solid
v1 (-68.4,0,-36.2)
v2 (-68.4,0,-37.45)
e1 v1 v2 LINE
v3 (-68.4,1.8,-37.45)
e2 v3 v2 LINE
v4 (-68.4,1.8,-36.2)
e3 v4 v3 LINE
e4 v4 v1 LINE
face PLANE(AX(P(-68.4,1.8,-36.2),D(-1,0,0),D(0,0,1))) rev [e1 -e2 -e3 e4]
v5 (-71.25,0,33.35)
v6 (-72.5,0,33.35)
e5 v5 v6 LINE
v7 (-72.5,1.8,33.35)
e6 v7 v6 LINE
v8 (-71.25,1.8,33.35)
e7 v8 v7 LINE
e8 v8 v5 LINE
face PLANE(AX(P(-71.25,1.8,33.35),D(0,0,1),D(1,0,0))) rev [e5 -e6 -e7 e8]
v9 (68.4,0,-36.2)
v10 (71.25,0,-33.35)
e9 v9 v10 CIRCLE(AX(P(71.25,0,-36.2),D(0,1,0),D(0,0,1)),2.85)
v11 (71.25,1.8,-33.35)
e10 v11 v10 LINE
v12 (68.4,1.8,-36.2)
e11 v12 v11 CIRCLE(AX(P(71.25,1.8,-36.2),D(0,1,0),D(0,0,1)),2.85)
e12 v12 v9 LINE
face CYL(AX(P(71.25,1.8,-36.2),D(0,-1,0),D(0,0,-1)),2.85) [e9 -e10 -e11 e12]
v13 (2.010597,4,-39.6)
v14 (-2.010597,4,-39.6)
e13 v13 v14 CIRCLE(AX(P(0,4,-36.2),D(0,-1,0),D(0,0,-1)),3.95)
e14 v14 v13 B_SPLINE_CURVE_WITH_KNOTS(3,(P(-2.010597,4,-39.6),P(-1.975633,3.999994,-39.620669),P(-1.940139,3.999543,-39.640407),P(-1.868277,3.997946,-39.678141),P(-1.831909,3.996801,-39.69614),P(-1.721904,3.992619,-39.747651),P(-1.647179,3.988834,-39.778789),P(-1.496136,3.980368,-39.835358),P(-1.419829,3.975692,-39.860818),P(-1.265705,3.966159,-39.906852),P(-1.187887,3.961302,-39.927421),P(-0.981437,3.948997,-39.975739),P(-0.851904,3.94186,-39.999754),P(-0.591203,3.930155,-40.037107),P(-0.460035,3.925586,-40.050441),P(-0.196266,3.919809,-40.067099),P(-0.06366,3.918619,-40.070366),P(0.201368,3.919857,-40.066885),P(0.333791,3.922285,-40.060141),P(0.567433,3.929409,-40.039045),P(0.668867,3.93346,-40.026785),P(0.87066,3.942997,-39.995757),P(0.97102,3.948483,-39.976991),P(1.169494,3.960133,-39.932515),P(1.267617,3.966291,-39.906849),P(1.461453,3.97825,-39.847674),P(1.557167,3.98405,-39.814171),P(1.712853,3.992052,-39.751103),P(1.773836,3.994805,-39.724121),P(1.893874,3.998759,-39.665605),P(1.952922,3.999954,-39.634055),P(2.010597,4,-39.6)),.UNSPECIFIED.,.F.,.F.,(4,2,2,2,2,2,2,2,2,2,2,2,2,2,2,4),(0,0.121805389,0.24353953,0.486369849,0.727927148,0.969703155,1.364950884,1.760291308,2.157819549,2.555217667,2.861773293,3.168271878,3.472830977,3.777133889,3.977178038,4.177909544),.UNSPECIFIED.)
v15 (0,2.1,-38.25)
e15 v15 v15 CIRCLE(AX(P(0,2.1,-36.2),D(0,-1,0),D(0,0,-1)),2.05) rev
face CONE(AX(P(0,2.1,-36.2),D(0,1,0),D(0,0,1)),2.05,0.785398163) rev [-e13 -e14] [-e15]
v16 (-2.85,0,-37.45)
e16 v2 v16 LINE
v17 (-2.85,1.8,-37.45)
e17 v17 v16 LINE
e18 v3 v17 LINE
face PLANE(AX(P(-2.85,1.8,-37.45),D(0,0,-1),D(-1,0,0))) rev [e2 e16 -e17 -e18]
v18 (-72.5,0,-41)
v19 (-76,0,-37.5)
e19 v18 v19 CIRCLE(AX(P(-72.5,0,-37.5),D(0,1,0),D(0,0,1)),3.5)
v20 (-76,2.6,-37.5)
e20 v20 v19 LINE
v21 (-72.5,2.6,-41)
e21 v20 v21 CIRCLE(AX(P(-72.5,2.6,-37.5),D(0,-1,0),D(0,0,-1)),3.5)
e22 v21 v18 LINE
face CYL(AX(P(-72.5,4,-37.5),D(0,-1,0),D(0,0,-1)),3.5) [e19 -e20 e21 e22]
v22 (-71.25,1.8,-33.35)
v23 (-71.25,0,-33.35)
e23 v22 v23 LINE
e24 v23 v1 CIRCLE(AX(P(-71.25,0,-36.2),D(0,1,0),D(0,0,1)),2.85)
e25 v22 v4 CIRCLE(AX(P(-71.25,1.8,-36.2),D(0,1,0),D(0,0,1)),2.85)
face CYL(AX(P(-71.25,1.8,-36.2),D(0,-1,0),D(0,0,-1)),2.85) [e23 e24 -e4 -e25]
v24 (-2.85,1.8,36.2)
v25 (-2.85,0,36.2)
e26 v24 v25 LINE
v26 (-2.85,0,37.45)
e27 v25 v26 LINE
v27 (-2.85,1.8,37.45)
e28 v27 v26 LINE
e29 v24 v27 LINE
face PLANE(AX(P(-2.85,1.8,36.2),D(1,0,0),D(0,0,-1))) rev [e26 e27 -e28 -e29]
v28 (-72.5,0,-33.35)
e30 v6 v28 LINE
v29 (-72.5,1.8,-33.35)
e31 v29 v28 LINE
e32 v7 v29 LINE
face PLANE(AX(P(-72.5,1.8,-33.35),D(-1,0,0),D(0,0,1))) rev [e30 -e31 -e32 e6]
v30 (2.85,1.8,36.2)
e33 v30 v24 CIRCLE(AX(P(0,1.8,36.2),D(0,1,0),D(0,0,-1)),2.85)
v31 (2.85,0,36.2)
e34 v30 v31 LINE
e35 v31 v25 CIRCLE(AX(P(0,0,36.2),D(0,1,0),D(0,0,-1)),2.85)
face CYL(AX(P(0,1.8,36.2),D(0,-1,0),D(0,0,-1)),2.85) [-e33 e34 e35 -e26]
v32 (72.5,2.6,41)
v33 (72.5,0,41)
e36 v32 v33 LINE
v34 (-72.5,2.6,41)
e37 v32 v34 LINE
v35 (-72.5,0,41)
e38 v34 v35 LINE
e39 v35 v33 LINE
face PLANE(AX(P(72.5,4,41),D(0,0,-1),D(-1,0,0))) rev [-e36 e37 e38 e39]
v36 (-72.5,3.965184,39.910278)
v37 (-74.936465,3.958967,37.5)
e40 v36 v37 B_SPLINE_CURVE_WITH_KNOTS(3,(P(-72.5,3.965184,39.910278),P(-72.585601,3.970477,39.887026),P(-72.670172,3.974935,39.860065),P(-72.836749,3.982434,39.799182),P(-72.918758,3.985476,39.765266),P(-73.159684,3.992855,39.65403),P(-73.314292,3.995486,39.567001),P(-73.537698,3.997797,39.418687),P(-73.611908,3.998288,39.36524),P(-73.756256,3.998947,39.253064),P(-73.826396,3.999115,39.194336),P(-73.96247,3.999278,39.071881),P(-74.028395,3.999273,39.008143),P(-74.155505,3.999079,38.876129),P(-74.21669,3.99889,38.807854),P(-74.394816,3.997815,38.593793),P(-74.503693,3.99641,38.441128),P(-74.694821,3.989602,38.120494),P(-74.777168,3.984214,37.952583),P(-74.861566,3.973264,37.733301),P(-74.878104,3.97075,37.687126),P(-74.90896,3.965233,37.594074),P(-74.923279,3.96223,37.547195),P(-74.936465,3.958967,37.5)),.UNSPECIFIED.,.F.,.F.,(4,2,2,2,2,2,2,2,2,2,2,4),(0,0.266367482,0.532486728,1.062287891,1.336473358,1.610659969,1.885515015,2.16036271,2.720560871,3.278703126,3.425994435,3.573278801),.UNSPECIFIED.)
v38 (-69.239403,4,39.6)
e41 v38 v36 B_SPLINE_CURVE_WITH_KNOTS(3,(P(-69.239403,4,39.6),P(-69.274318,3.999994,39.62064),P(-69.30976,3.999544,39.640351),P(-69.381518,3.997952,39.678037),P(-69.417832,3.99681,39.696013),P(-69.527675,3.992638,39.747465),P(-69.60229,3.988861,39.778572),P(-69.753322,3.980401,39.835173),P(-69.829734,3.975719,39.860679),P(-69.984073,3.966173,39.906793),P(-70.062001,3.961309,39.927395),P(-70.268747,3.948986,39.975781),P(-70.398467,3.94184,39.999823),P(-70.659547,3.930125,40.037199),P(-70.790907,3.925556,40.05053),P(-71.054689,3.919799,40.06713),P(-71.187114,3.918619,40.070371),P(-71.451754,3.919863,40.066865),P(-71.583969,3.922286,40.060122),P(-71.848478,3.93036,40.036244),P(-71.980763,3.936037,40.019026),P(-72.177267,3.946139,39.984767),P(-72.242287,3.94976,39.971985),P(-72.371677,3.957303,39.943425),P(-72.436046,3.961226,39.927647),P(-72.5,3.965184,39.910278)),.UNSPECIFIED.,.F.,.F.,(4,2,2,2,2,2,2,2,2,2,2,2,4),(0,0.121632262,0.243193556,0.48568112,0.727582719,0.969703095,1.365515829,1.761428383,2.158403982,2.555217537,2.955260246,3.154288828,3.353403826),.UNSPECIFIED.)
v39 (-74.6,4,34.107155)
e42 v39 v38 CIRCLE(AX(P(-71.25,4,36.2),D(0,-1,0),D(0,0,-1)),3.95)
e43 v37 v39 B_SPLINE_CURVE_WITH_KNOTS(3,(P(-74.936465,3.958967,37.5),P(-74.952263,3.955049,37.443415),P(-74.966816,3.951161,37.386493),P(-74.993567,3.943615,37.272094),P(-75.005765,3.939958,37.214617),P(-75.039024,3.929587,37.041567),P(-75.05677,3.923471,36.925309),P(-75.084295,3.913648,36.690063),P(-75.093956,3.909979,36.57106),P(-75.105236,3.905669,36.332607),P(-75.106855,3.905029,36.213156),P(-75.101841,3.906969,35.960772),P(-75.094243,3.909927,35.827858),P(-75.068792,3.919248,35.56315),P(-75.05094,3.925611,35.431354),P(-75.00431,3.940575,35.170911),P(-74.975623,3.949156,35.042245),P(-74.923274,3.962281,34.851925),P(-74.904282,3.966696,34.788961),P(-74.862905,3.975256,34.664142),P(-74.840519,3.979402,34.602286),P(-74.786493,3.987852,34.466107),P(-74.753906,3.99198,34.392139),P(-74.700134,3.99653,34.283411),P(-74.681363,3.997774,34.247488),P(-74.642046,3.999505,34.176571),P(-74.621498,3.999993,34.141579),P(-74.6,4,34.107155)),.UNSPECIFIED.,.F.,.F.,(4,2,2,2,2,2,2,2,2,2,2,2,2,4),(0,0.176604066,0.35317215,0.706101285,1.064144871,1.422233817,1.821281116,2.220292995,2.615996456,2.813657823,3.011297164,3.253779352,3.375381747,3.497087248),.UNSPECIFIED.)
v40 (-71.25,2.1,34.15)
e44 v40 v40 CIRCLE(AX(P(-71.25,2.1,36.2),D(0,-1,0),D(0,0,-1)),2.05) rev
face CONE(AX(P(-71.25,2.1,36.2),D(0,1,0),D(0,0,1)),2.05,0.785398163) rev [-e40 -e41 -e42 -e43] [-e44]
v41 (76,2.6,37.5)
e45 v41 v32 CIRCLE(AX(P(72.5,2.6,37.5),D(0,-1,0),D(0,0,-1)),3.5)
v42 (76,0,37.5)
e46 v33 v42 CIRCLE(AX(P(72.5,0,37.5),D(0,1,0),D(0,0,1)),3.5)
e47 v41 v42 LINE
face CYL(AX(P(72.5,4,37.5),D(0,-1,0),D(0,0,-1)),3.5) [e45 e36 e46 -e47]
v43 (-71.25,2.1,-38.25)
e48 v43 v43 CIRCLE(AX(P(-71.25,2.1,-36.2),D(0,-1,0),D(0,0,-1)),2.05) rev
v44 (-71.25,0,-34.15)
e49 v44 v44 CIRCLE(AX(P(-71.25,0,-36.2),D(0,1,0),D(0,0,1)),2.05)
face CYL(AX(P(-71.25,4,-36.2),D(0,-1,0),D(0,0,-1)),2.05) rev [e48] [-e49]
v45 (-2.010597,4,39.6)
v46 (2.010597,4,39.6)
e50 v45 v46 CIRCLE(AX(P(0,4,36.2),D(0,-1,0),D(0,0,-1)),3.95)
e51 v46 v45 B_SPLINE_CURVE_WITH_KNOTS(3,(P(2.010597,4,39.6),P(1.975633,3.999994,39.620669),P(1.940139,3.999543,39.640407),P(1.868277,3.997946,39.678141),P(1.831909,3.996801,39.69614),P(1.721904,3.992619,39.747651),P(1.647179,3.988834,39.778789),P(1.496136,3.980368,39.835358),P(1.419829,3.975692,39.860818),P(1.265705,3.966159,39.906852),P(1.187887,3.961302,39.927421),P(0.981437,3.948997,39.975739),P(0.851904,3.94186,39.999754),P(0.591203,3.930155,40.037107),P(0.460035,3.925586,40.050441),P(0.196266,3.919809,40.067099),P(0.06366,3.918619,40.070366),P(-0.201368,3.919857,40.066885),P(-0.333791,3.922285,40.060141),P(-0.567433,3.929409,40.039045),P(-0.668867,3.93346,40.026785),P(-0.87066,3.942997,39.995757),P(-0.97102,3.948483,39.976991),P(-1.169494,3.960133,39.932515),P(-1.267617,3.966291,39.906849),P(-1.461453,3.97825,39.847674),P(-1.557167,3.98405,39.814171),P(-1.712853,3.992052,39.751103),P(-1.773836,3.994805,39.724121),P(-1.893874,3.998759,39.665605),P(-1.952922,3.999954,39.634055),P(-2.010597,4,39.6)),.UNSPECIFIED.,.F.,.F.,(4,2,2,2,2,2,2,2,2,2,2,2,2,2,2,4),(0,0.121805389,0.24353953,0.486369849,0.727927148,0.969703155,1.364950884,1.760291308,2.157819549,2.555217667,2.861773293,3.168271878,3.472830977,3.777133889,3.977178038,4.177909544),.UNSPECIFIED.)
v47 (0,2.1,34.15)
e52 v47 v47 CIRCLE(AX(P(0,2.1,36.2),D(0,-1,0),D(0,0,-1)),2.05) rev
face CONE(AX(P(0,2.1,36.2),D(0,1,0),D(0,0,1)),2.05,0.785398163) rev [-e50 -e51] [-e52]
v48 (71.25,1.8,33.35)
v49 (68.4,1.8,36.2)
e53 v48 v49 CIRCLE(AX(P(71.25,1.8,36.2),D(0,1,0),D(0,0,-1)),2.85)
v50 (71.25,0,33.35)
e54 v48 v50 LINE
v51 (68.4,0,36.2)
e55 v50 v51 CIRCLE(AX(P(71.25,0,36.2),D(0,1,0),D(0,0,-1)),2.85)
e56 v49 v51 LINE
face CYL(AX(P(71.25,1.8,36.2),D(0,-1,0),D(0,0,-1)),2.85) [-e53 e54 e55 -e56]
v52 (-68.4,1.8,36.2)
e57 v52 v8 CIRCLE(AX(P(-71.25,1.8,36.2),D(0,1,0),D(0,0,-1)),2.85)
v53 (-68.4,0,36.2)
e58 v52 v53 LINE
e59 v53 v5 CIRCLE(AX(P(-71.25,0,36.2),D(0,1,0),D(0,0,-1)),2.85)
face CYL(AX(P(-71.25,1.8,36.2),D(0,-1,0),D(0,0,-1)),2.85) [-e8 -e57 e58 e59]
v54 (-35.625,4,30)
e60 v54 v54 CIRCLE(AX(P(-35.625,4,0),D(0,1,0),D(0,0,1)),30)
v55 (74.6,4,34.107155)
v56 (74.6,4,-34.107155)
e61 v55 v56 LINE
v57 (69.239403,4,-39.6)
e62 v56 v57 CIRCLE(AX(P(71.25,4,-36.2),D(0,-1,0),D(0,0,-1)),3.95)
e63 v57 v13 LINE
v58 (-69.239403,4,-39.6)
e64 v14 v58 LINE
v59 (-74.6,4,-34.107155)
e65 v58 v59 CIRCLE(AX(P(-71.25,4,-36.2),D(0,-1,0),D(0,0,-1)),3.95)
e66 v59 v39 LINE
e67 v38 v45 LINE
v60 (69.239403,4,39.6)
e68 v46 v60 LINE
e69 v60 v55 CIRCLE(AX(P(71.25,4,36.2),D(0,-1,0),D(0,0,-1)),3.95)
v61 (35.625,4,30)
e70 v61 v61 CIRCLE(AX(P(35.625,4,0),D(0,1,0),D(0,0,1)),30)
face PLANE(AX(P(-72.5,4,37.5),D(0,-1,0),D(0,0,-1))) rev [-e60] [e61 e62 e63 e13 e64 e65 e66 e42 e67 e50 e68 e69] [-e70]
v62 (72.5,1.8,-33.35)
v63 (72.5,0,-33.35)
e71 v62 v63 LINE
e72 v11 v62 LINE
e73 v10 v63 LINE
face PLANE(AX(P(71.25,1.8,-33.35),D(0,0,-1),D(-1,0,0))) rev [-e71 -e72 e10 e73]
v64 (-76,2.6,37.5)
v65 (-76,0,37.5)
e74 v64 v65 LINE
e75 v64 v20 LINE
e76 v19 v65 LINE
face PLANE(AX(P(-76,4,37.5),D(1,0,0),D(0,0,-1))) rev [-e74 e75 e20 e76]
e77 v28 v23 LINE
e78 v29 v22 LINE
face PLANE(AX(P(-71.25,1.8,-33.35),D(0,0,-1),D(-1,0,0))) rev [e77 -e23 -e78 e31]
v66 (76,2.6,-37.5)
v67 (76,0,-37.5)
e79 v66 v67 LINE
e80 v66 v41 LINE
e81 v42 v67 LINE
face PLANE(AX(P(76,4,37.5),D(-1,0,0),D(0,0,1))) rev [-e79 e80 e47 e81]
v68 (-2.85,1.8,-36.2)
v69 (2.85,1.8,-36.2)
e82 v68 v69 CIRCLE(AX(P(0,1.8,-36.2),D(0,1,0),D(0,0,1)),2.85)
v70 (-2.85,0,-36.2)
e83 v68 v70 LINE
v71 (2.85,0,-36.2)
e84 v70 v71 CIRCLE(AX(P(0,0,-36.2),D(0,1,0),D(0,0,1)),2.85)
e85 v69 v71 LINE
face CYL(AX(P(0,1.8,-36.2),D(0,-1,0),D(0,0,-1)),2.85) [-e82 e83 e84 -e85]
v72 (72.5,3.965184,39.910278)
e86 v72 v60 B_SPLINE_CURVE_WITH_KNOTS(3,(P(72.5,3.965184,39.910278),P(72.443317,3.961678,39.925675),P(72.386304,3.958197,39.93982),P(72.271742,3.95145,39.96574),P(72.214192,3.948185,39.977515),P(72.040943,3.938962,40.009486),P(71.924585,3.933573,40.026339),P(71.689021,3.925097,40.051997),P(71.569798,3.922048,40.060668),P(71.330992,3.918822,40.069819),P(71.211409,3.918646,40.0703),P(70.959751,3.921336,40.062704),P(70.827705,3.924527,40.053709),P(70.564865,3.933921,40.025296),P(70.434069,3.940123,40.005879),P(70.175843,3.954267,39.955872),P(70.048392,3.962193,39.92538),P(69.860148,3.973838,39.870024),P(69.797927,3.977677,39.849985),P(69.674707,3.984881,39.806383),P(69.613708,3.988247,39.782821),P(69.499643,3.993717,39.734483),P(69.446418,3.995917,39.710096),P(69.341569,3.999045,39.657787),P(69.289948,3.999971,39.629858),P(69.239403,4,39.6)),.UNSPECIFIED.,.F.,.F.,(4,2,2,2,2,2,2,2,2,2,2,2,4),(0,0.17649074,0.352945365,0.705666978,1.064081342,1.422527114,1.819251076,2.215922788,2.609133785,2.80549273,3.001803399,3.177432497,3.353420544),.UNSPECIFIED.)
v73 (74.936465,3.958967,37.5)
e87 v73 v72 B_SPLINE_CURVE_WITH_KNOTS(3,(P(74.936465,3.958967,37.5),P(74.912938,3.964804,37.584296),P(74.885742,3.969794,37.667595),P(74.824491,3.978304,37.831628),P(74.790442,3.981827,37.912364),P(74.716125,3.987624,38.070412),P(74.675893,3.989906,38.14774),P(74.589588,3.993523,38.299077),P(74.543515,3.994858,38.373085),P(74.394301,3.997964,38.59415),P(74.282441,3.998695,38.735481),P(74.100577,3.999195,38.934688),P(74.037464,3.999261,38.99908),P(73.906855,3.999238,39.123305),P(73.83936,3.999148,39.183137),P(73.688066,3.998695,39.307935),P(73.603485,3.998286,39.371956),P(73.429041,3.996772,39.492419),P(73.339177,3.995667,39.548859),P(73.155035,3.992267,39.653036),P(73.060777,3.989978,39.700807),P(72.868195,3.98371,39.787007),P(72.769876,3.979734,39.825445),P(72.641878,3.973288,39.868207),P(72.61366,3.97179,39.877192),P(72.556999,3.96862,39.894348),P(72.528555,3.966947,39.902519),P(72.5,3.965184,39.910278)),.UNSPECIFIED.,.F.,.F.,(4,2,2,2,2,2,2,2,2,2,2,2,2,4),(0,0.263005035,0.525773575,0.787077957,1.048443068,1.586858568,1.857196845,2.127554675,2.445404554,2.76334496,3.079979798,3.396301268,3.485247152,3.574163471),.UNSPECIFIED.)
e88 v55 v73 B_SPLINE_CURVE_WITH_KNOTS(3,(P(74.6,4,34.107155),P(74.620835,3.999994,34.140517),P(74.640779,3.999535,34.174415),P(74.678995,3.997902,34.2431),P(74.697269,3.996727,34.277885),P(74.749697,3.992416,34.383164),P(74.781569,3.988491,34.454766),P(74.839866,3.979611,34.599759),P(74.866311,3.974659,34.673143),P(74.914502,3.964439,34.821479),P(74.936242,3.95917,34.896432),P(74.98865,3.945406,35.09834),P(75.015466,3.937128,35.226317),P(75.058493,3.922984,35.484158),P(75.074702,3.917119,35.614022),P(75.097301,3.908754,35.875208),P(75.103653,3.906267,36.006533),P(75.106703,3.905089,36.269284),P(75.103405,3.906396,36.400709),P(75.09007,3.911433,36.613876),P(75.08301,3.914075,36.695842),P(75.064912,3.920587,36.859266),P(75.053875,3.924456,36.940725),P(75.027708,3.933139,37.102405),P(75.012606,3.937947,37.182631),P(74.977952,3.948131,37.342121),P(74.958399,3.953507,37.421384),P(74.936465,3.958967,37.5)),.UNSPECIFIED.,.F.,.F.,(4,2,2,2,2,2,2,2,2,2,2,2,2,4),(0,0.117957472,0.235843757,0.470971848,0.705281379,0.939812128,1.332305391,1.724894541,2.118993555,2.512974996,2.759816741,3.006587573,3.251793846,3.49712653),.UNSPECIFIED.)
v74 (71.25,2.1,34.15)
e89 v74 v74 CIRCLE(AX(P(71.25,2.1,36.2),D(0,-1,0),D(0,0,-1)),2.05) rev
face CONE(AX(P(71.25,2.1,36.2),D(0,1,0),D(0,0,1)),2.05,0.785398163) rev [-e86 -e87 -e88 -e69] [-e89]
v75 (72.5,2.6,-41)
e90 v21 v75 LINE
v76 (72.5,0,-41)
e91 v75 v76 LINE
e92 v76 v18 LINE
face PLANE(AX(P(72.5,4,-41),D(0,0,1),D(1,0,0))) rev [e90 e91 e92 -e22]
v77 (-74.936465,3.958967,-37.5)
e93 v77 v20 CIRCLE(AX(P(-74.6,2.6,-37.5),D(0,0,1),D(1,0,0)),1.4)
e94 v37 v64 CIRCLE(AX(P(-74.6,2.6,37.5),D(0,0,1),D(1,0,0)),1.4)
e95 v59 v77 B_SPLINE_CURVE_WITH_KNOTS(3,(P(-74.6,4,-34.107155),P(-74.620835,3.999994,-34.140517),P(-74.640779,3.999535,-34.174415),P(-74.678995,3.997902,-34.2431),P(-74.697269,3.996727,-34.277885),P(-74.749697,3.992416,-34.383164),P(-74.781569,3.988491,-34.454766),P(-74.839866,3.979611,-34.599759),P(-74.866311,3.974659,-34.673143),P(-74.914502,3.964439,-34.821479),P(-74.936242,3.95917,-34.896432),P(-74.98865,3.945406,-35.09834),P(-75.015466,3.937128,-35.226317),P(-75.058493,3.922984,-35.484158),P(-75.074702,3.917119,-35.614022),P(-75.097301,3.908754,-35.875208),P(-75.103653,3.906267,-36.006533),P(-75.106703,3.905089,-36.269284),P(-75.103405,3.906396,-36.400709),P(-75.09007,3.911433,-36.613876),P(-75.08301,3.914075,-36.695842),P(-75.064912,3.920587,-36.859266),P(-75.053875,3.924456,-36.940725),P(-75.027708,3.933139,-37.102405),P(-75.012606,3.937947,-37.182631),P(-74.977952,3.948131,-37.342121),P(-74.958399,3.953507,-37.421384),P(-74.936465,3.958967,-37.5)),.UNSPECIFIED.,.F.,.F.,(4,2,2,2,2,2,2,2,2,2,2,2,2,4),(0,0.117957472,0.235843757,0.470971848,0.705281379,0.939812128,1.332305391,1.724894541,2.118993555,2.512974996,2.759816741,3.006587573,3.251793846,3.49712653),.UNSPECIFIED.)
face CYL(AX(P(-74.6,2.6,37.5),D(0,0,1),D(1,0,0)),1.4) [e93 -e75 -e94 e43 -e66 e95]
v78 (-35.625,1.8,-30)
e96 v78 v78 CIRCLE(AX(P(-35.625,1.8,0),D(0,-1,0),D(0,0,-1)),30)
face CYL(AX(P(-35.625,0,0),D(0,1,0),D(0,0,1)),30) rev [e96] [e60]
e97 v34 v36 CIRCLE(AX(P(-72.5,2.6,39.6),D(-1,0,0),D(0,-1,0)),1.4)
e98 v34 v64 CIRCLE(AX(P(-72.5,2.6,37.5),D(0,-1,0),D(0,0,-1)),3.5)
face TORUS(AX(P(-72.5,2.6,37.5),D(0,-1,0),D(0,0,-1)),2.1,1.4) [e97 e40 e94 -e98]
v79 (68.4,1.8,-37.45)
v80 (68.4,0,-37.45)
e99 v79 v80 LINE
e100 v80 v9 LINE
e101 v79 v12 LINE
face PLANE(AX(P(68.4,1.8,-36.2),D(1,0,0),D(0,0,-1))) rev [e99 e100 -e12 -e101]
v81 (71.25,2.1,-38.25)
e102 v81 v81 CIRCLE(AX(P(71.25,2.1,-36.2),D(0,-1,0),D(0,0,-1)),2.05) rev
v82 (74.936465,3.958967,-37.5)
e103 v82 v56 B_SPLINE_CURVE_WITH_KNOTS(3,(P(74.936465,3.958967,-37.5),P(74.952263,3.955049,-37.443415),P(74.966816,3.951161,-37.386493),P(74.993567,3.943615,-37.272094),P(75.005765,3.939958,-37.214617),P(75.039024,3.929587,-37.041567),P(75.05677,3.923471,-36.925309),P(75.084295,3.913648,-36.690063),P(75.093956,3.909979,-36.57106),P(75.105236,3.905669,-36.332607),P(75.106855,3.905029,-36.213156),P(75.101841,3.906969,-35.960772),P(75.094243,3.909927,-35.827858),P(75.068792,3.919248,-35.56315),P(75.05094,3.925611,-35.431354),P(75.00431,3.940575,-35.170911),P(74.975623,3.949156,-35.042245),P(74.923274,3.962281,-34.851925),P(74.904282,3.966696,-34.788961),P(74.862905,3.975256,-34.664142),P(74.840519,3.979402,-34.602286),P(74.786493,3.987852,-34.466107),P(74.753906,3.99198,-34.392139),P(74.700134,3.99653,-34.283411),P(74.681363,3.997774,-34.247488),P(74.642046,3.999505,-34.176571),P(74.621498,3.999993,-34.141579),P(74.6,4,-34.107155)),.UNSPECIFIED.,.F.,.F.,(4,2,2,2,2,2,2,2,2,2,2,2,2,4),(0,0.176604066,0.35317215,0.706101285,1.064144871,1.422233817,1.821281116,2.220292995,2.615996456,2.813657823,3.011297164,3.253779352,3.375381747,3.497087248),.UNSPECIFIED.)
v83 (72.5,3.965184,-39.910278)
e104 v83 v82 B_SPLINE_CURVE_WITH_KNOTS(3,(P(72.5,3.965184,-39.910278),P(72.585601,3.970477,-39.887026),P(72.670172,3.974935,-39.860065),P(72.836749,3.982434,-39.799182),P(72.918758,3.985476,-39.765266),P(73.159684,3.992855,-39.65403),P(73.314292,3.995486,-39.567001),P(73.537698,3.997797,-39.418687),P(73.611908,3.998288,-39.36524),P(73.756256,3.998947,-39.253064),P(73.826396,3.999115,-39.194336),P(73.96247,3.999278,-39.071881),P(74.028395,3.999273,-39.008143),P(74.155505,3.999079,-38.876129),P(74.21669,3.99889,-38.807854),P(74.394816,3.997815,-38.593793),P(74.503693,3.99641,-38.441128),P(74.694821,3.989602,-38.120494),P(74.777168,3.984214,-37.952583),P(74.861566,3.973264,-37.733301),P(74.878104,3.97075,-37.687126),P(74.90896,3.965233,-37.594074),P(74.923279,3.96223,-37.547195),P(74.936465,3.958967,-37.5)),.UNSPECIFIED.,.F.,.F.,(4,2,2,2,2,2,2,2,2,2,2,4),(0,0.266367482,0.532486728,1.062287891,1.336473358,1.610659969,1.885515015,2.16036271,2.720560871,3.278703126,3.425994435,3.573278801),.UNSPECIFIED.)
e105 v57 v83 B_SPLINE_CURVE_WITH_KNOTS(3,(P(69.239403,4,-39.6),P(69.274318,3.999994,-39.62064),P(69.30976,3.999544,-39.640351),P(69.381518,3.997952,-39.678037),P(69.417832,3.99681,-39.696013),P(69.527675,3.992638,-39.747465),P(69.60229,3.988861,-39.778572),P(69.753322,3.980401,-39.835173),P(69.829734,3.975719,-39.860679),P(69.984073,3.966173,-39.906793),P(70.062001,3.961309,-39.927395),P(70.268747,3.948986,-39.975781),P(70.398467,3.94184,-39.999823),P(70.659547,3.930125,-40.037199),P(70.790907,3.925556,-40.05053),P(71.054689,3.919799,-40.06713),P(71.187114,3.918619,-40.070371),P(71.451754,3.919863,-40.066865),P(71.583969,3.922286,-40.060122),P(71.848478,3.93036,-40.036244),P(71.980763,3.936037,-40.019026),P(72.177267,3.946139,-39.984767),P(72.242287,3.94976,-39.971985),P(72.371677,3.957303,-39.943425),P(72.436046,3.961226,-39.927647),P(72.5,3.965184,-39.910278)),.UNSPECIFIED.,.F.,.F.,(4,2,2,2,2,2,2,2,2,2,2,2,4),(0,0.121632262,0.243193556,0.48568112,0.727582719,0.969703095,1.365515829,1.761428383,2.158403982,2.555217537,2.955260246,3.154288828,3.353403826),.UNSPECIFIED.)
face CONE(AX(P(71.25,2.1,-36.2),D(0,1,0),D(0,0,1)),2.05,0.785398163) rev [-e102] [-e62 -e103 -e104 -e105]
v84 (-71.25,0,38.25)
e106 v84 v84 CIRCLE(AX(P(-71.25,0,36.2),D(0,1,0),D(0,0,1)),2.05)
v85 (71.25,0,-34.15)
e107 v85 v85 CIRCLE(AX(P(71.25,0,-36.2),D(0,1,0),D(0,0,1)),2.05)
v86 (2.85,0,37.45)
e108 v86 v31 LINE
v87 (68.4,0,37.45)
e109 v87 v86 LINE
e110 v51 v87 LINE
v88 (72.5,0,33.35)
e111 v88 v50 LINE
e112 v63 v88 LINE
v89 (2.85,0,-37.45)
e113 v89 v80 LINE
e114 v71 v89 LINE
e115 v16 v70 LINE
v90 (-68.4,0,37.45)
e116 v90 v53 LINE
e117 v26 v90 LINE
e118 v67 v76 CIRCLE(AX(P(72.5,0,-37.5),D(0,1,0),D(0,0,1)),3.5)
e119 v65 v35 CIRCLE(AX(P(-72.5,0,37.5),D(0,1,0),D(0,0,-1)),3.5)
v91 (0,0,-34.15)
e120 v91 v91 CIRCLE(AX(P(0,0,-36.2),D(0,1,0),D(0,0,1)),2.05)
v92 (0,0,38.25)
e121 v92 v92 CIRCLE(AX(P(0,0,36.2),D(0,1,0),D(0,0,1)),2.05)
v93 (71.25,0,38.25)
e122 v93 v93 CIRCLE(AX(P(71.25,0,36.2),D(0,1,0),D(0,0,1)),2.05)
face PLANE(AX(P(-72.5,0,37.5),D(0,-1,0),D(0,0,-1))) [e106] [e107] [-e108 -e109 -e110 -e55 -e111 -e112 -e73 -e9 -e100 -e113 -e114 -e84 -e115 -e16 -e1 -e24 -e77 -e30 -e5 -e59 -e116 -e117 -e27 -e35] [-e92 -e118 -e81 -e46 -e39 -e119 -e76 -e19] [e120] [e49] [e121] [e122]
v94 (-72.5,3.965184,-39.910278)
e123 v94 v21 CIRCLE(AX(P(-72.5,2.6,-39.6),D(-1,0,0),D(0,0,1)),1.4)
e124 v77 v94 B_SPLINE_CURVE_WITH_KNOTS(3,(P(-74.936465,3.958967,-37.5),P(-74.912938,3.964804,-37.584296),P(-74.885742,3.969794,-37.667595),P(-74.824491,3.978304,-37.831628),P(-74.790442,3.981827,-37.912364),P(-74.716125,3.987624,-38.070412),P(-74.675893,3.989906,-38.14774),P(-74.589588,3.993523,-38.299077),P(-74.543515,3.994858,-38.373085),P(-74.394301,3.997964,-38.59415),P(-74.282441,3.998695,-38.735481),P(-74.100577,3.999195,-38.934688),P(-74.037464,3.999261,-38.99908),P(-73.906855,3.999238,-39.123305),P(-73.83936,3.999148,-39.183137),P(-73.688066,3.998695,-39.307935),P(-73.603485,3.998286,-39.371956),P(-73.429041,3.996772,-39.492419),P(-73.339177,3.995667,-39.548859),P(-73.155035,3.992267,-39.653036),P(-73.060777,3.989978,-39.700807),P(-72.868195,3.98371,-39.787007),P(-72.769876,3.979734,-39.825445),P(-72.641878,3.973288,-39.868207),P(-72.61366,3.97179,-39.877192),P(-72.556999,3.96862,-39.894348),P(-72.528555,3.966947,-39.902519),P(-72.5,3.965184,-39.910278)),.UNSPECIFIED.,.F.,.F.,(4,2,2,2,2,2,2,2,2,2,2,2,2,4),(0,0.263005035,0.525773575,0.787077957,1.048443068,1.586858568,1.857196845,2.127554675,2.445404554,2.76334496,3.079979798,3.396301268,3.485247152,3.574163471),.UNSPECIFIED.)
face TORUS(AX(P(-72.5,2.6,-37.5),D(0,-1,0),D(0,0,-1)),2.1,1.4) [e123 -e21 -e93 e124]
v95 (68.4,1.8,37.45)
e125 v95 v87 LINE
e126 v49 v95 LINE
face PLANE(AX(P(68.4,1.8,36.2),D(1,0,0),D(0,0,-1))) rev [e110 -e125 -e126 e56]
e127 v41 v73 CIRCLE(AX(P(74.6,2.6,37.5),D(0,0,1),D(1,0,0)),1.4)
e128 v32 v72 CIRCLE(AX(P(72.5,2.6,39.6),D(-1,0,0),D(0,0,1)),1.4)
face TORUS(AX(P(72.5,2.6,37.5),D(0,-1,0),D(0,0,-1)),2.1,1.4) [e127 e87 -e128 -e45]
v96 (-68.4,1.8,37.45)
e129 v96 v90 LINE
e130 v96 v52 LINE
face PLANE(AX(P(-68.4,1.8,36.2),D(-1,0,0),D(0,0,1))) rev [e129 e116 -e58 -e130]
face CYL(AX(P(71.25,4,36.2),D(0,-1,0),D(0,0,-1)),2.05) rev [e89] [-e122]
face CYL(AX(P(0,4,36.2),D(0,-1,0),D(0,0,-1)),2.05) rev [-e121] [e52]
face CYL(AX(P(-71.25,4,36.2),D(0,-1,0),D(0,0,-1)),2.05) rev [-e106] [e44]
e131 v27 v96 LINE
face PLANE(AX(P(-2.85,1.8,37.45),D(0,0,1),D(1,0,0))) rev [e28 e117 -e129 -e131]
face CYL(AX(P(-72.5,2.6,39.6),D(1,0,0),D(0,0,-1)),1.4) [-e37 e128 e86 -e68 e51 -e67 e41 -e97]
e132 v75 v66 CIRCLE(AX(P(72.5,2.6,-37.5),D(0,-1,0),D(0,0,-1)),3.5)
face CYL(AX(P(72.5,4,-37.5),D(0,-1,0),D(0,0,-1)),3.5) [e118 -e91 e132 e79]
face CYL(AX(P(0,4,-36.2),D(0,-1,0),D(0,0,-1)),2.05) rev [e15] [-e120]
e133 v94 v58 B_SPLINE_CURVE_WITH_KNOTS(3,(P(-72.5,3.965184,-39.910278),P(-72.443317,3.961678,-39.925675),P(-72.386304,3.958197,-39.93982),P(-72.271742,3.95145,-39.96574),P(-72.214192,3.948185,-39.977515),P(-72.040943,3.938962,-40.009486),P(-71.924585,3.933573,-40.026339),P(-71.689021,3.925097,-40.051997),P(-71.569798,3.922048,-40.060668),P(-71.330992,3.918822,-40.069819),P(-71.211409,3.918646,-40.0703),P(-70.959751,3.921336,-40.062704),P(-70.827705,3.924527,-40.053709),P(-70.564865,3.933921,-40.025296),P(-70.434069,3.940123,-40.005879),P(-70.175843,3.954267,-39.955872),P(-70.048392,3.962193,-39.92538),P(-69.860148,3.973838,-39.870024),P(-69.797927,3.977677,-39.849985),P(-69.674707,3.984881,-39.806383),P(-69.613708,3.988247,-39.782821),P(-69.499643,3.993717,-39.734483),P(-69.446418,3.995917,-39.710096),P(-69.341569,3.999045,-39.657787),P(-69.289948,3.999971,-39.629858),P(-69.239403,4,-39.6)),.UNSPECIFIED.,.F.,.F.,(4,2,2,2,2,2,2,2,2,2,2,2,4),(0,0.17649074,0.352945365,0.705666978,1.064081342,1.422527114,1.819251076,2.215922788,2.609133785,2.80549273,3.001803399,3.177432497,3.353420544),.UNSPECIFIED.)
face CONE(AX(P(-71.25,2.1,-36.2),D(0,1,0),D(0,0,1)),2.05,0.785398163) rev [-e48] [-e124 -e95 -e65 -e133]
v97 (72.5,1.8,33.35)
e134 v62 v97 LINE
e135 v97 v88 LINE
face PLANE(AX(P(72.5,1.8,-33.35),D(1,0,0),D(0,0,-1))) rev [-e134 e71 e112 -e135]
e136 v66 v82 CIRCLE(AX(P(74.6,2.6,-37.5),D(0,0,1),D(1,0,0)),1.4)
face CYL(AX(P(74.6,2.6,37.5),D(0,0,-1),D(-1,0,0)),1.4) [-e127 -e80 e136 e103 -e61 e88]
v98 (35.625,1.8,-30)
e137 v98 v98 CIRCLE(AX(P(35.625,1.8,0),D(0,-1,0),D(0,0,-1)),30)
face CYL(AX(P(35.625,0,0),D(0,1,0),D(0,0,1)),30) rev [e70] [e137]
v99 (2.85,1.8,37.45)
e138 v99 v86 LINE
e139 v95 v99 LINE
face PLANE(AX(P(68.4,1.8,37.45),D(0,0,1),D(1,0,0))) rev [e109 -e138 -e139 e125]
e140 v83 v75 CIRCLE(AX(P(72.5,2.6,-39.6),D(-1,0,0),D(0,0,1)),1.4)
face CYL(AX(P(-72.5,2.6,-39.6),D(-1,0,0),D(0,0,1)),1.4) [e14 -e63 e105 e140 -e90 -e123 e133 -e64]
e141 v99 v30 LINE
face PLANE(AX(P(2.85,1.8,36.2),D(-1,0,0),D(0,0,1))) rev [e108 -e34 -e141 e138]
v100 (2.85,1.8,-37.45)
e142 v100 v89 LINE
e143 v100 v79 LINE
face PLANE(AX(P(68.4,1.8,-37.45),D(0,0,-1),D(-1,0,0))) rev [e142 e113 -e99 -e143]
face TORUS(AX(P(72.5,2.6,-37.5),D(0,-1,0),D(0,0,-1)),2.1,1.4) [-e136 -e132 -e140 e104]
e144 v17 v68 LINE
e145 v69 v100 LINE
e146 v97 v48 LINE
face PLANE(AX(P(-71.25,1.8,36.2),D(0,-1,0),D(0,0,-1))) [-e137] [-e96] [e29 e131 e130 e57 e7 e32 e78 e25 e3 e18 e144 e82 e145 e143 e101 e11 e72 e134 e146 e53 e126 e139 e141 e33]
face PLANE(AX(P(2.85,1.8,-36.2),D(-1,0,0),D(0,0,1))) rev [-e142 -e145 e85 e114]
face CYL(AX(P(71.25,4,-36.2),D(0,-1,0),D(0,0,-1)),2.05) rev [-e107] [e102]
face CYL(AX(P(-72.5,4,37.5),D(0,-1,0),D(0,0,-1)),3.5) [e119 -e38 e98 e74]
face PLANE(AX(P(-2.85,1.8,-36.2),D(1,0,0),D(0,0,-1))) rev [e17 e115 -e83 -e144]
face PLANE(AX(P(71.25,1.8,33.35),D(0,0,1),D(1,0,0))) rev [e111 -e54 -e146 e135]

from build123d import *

# Parameters (mm, degrees)
SKETCH1_R           = 2.05
BOSS_EXTRUDE1_DEPTH = 4
FILLET1_R           = 1.4
CHAMFER1_SIZE       = 1.9
CUT_EXTRUDE1_DEPTH  = 1.8
SKETCH4_R           = 30
CUT_EXTRUDE2_DEPTH  = 87.446515392


with BuildPart() as part:
    # Sketch1 → Boss-Extrude1 (new body)
    with BuildSketch(Plane(origin=(0, 0, 0), x_dir=(1, 0, 0), z_dir=(0, 1, 0))):
        with BuildLine():
            Line((72.5, -41), (-72.5, -41))
            ThreePointArc((-72.5, -41), (-74.974873734, -39.974873734), (-76, -37.5))
            Line((-76, -37.5), (-76, 37.5))
            ThreePointArc((-76, 37.5), (-74.974873734, 39.974873734), (-72.5, 41))
            Line((-72.5, 41), (72.5, 41))
            ThreePointArc((72.5, 41), (74.974873734, 39.974873734), (76, 37.5))
            Line((76, 37.5), (76, -37.5))
            ThreePointArc((76, -37.5), (74.974873734, -39.974873734), (72.5, -41))
        make_face()
        with Locations(Location((-71.25, 36.2, 0), (0, 0, 270))):
            Circle(SKETCH1_R, mode=Mode.SUBTRACT)
        with Locations(Location((-71.25, -36.2, 0), (0, 0, 270))):
            Circle(SKETCH1_R, mode=Mode.SUBTRACT)
        with Locations(Location((71.25, -36.2, 0), (0, 0, 270))):
            Circle(SKETCH1_R, mode=Mode.SUBTRACT)
        with Locations(Location((71.25, 36.2, 0), (0, 0, 270))):
            Circle(SKETCH1_R, mode=Mode.SUBTRACT)
        with Locations(Location((0, 36.2, 0), (0, 0, 270))):
            Circle(SKETCH1_R, mode=Mode.SUBTRACT)
        with Locations(Location((0, -36.2, 0), (0, 0, 270))):
            Circle(SKETCH1_R, mode=Mode.SUBTRACT)
    extrude(amount=BOSS_EXTRUDE1_DEPTH)

    # Fillet1
    fillet1_edges = [part.edges().sort_by_distance(p)[0] for p in [
        (74.974873734, 4, 39.974873734),
        (76, 4, 0),
        (74.974873734, 4, -39.974873734),
        (0, 4, -41),
        (-74.974873734, 4, -39.974873734),
        (-76, 4, 0),
        (-74.974873734, 4, 39.974873734),
        (0, 4, 41),
    ]]
    fillet(fillet1_edges, radius=FILLET1_R)

    # Chamfer1
    # the kernel refuses this chamfer: 1.9 mm, written as the material it takes off along each edge
    with BuildSketch(Plane(origin=(71.25, 4, 36.2), x_dir=(0, 0, 1), z_dir=(-1, 0, 0))) as chamfer1_piece_1:
        Polygon((2.05 + CHAMFER1_SIZE, 0), (2.05, -CHAMFER1_SIZE), (2.05, 0), align=None)
    revolve(axis=Axis((71.25, 4, 36.2), (0, 1, 0)), mode=Mode.SUBTRACT)
    with BuildSketch(Plane(origin=(71.25, 4, -36.2), x_dir=(0, 0, 1), z_dir=(-1, 0, 0))) as chamfer1_piece_2:
        Polygon((2.05 + CHAMFER1_SIZE, 0), (2.05, -CHAMFER1_SIZE), (2.05, 0), align=None)
    revolve(axis=Axis((71.25, 4, -36.2), (0, 1, 0)), mode=Mode.SUBTRACT)
    with BuildSketch(Plane(origin=(-71.25, 4, 36.2), x_dir=(0, 0, 1), z_dir=(-1, 0, 0))) as chamfer1_piece_3:
        Polygon((2.05 + CHAMFER1_SIZE, 0), (2.05, -CHAMFER1_SIZE), (2.05, 0), align=None)
    revolve(axis=Axis((-71.25, 4, 36.2), (0, 1, 0)), mode=Mode.SUBTRACT)
    with BuildSketch(Plane(origin=(-71.25, 4, -36.2), x_dir=(0, 0, 1), z_dir=(-1, 0, 0))) as chamfer1_piece_4:
        Polygon((2.05 + CHAMFER1_SIZE, 0), (2.05, -CHAMFER1_SIZE), (2.05, 0), align=None)
    revolve(axis=Axis((-71.25, 4, -36.2), (0, 1, 0)), mode=Mode.SUBTRACT)
    with BuildSketch(Plane(origin=(0, 4, 36.2), x_dir=(0, 0, 1), z_dir=(-1, 0, 0))) as chamfer1_piece_5:
        Polygon((2.05 + CHAMFER1_SIZE, 0), (2.05, -CHAMFER1_SIZE), (2.05, 0), align=None)
    revolve(axis=Axis((0, 4, 36.2), (0, 1, 0)), mode=Mode.SUBTRACT)
    with BuildSketch(Plane(origin=(0, 4, -36.2), x_dir=(0, 0, 1), z_dir=(-1, 0, 0))) as chamfer1_piece_6:
        Polygon((2.05 + CHAMFER1_SIZE, 0), (2.05, -CHAMFER1_SIZE), (2.05, 0), align=None)
    revolve(axis=Axis((0, 4, -36.2), (0, 1, 0)), mode=Mode.SUBTRACT)

    # Sketch2 → Cut-Extrude1 (cut)
    with BuildSketch(Plane.XZ):
        with BuildLine():
            Line((-71.25, 33.35), (-72.5, 33.35))
            Line((-72.5, 33.35), (-72.5, -33.35))
            Line((-72.5, -33.35), (-71.25, -33.35))
            ThreePointArc((-71.25, -33.35), (-69.234745674, -34.184745674), (-68.4, -36.2))
            Line((-68.4, -36.2), (-68.4, -37.45))
            Line((-68.4, -37.45), (-2.85, -37.45))
            Line((-2.85, -37.45), (-2.85, -36.2))
            ThreePointArc((-2.85, -36.2), (0, -33.35), (2.85, -36.2))
            Line((2.85, -36.2), (2.85, -37.45))
            Line((2.85, -37.45), (68.4, -37.45))
            Line((68.4, -37.45), (68.4, -36.2))
            ThreePointArc((68.4, -36.2), (69.234745674, -34.184745674), (71.25, -33.35))
            Line((71.25, -33.35), (72.5, -33.35))
            Line((72.5, -33.35), (72.5, 33.35))
            Line((72.5, 33.35), (71.25, 33.35))
            ThreePointArc((71.25, 33.35), (69.234745674, 34.184745674), (68.4, 36.2))
            Line((68.4, 36.2), (68.4, 37.45))
            Line((68.4, 37.45), (2.85, 37.45))
            Line((2.85, 37.45), (2.85, 36.2))
            ThreePointArc((2.85, 36.2), (0, 33.35), (-2.85, 36.2))
            Line((-2.85, 36.2), (-2.85, 37.45))
            Line((-2.85, 37.45), (-68.4, 37.45))
            Line((-68.4, 37.45), (-68.4, 36.2))
            ThreePointArc((-68.4, 36.2), (-69.234745674, 34.184745674), (-71.25, 33.35))
        make_face()
    extrude(amount=-CUT_EXTRUDE1_DEPTH, mode=Mode.SUBTRACT)

    # Sketch4 → Cut-Extrude2 (cut, through all)
    with BuildSketch(Plane(origin=(0, 4, 0), x_dir=(1, 0, 0), z_dir=(0, 1, 0))):
        with Locations(Location((-35.625, 0, 0), (0, 0, 270))):
            Circle(SKETCH4_R)
        with Locations(Location((35.625, 0, 0), (0, 0, 270))):
            Circle(SKETCH4_R)
    extrude(amount=-CUT_EXTRUDE2_DEPTH, mode=Mode.SUBTRACT)


solid = part.part
